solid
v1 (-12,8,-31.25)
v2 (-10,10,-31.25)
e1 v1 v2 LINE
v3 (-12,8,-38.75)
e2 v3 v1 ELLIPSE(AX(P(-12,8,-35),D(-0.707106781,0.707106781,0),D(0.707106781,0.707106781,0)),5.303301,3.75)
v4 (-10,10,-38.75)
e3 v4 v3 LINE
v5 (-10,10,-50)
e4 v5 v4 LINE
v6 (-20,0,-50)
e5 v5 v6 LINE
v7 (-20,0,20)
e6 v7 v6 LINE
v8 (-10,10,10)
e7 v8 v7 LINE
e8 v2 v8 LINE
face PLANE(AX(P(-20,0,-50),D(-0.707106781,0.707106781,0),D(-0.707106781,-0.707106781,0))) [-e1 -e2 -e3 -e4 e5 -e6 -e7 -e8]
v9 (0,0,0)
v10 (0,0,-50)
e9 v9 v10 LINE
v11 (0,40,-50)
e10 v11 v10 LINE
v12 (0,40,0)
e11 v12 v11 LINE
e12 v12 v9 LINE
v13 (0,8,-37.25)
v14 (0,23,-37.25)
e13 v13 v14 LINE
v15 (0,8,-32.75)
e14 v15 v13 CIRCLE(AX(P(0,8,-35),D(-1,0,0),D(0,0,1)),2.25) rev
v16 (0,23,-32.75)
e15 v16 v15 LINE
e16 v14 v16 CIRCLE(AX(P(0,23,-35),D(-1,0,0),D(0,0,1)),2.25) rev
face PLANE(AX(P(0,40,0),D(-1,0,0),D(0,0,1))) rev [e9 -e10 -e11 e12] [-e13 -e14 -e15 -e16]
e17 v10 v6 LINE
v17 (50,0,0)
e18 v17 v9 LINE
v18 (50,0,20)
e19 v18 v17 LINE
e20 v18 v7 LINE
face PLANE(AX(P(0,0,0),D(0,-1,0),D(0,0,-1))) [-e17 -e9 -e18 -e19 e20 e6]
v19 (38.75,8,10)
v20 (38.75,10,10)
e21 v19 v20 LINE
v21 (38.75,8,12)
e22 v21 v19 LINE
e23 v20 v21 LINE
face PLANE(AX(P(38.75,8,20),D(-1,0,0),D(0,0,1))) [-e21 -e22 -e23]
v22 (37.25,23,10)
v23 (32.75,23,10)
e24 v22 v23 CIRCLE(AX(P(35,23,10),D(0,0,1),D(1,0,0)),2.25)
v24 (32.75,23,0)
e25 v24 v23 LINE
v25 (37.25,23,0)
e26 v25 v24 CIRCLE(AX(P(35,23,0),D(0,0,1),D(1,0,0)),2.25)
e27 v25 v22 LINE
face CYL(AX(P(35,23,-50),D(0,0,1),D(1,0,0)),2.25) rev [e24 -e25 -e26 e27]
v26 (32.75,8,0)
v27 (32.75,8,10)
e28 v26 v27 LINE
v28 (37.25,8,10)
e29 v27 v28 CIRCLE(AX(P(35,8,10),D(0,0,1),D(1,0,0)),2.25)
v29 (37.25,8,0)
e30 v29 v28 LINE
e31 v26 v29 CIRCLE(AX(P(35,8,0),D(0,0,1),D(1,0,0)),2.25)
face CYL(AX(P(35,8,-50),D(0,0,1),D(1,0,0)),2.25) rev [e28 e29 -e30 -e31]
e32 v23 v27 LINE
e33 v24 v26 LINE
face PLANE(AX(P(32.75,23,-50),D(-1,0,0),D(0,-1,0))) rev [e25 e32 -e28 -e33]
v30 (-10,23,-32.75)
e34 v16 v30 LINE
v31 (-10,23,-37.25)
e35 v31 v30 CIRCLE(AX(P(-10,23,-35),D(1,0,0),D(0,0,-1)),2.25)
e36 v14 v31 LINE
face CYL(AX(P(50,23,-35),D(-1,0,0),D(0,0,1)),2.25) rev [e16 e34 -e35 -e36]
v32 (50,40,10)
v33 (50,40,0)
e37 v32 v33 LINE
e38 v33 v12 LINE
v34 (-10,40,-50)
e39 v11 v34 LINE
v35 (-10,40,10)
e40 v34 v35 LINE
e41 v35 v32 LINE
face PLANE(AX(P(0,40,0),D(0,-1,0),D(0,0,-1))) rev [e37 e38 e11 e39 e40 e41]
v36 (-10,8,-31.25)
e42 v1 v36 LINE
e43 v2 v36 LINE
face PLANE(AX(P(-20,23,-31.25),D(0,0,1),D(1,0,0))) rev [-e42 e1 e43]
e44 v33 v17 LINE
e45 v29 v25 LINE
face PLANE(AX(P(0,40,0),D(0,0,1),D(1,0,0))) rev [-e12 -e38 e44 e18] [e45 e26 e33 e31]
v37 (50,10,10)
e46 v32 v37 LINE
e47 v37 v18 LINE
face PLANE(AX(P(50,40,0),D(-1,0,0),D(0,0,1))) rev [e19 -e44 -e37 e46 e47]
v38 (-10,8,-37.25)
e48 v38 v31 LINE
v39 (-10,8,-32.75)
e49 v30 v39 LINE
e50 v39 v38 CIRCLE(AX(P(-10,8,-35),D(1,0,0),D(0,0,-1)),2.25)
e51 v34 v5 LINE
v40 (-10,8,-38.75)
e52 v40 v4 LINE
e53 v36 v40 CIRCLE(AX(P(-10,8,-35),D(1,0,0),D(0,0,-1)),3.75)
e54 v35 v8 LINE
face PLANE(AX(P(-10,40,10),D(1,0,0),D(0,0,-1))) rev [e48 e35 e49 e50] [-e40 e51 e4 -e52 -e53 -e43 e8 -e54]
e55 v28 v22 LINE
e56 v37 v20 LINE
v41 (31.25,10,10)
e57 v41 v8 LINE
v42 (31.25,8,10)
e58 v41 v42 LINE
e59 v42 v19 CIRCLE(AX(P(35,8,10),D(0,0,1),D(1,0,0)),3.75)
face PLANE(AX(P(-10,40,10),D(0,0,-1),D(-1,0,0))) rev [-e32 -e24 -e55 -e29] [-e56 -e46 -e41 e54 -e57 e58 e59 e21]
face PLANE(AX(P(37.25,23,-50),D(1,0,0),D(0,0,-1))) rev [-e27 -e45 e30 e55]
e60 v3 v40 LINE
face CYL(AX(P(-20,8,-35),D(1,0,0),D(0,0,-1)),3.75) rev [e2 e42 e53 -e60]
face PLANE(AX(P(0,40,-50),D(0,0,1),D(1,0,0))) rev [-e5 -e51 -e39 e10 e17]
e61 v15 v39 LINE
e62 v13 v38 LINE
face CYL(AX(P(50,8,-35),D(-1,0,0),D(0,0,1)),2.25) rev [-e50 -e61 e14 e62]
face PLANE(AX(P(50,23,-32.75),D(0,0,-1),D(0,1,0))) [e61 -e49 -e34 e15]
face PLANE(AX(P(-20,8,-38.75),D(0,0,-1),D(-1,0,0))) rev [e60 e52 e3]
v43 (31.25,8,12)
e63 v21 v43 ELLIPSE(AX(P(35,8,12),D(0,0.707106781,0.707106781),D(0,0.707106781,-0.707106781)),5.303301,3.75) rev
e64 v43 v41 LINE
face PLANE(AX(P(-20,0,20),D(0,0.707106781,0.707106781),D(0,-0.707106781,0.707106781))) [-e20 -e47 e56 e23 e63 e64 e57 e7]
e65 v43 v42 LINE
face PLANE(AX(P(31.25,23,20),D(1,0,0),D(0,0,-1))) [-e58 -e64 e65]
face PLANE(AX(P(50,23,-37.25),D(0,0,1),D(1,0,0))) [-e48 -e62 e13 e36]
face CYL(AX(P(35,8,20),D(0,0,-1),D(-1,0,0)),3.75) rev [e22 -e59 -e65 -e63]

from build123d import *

# Parameters (mm, degrees)
BOSS_EXTRUDE1_DEPTH = 40
BOSS_EXTRUDE2_DEPTH = 15
DRAFT1_START        = -20
DRAFT1_DEPTH        = 70
DRAFT1_START_2      = -50
DRAFT1_2_DEPTH      = 71
CUT_EXTRUDE1_DEPTH  = 88.749643874
CUT_EXTRUDE3_DEPTH  = 88.749643874


with BuildPart() as part:
    # Sketch1 → Boss-Extrude1 (new body)
    with BuildSketch(Plane(origin=(0, 0, 0), x_dir=(1, 0, 0), z_dir=(0, 1, 0))):
        Polygon((0, 0), (0, 50), (-10, 50), (-10, -10), (50, -10), (50, 0), align=None)
    extrude(amount=BOSS_EXTRUDE1_DEPTH)

    # Sketch2 → Boss-Extrude2 (add)
    with BuildSketch(Plane.XZ):
        Polygon((50, 20), (50, 10), (-10, 10), (-10, -50), (-20, -50), (-20, 20), align=None)
    extrude(amount=-BOSS_EXTRUDE2_DEPTH)

    # Draft1: read off the stored shape, not the designer's step
    # Draft1 outline → Draft1 (cut)
    with BuildSketch(Plane.YZ.offset(DRAFT1_START)):
        Polygon((0, 20), (10, 10), (15, 10), (15, 20), align=None)
    extrude(amount=DRAFT1_DEPTH, mode=Mode.SUBTRACT)

    # Draft1 2 outline → Draft1 2 (cut)
    with BuildSketch(Plane.XY.offset(DRAFT1_START_2)):
        Polygon((-20, 0), (-10, 10), (-10, 15), (-20, 15), align=None)
    extrude(amount=DRAFT1_2_DEPTH, mode=Mode.SUBTRACT)

    # Sketch3 → Cut-Extrude1 (cut, through all)
    with BuildSketch(Plane.XY.offset(10)):
        with BuildLine():
            Line((37.25, 23), (37.25, 8))
            ThreePointArc((37.25, 8), (35, 5.75), (32.75, 8))
            Line((32.75, 8), (32.75, 23))
            ThreePointArc((32.75, 23), (35, 25.25), (37.25, 23))
        make_face()
    cut_extrude1 = extrude(amount=-CUT_EXTRUDE1_DEPTH, mode=Mode.SUBTRACT)

    # Sketch4 → Cut-Extrude3 (cut, through all)
    with BuildSketch(Plane.XY.offset(10)):
        with BuildLine():
            Line((38.75, 8), (38.75, 23))
            ThreePointArc((38.75, 23), (35, 26.75), (31.25, 23))
            Line((31.25, 23), (31.25, 8))
            ThreePointArc((31.25, 8), (35, 4.25), (38.75, 8))
        make_face()
    cut_extrude3 = extrude(amount=CUT_EXTRUDE3_DEPTH, mode=Mode.SUBTRACT)

    # Mirror1: Cut-Extrude1, Cut-Extrude3 across plane
    add(cut_extrude1.mirror(Plane(origin=(0, 0, 0), x_dir=(-0.7071067811865476, 0, 0.7071067811865476), z_dir=(-0.7071067811865477, 0, -0.7071067811865475))), mode=Mode.SUBTRACT)
    add(cut_extrude3.mirror(Plane(origin=(0, 0, 0), x_dir=(-0.7071067811865476, 0, 0.7071067811865476), z_dir=(-0.7071067811865477, 0, -0.7071067811865475))), mode=Mode.SUBTRACT)


solid = part.part
